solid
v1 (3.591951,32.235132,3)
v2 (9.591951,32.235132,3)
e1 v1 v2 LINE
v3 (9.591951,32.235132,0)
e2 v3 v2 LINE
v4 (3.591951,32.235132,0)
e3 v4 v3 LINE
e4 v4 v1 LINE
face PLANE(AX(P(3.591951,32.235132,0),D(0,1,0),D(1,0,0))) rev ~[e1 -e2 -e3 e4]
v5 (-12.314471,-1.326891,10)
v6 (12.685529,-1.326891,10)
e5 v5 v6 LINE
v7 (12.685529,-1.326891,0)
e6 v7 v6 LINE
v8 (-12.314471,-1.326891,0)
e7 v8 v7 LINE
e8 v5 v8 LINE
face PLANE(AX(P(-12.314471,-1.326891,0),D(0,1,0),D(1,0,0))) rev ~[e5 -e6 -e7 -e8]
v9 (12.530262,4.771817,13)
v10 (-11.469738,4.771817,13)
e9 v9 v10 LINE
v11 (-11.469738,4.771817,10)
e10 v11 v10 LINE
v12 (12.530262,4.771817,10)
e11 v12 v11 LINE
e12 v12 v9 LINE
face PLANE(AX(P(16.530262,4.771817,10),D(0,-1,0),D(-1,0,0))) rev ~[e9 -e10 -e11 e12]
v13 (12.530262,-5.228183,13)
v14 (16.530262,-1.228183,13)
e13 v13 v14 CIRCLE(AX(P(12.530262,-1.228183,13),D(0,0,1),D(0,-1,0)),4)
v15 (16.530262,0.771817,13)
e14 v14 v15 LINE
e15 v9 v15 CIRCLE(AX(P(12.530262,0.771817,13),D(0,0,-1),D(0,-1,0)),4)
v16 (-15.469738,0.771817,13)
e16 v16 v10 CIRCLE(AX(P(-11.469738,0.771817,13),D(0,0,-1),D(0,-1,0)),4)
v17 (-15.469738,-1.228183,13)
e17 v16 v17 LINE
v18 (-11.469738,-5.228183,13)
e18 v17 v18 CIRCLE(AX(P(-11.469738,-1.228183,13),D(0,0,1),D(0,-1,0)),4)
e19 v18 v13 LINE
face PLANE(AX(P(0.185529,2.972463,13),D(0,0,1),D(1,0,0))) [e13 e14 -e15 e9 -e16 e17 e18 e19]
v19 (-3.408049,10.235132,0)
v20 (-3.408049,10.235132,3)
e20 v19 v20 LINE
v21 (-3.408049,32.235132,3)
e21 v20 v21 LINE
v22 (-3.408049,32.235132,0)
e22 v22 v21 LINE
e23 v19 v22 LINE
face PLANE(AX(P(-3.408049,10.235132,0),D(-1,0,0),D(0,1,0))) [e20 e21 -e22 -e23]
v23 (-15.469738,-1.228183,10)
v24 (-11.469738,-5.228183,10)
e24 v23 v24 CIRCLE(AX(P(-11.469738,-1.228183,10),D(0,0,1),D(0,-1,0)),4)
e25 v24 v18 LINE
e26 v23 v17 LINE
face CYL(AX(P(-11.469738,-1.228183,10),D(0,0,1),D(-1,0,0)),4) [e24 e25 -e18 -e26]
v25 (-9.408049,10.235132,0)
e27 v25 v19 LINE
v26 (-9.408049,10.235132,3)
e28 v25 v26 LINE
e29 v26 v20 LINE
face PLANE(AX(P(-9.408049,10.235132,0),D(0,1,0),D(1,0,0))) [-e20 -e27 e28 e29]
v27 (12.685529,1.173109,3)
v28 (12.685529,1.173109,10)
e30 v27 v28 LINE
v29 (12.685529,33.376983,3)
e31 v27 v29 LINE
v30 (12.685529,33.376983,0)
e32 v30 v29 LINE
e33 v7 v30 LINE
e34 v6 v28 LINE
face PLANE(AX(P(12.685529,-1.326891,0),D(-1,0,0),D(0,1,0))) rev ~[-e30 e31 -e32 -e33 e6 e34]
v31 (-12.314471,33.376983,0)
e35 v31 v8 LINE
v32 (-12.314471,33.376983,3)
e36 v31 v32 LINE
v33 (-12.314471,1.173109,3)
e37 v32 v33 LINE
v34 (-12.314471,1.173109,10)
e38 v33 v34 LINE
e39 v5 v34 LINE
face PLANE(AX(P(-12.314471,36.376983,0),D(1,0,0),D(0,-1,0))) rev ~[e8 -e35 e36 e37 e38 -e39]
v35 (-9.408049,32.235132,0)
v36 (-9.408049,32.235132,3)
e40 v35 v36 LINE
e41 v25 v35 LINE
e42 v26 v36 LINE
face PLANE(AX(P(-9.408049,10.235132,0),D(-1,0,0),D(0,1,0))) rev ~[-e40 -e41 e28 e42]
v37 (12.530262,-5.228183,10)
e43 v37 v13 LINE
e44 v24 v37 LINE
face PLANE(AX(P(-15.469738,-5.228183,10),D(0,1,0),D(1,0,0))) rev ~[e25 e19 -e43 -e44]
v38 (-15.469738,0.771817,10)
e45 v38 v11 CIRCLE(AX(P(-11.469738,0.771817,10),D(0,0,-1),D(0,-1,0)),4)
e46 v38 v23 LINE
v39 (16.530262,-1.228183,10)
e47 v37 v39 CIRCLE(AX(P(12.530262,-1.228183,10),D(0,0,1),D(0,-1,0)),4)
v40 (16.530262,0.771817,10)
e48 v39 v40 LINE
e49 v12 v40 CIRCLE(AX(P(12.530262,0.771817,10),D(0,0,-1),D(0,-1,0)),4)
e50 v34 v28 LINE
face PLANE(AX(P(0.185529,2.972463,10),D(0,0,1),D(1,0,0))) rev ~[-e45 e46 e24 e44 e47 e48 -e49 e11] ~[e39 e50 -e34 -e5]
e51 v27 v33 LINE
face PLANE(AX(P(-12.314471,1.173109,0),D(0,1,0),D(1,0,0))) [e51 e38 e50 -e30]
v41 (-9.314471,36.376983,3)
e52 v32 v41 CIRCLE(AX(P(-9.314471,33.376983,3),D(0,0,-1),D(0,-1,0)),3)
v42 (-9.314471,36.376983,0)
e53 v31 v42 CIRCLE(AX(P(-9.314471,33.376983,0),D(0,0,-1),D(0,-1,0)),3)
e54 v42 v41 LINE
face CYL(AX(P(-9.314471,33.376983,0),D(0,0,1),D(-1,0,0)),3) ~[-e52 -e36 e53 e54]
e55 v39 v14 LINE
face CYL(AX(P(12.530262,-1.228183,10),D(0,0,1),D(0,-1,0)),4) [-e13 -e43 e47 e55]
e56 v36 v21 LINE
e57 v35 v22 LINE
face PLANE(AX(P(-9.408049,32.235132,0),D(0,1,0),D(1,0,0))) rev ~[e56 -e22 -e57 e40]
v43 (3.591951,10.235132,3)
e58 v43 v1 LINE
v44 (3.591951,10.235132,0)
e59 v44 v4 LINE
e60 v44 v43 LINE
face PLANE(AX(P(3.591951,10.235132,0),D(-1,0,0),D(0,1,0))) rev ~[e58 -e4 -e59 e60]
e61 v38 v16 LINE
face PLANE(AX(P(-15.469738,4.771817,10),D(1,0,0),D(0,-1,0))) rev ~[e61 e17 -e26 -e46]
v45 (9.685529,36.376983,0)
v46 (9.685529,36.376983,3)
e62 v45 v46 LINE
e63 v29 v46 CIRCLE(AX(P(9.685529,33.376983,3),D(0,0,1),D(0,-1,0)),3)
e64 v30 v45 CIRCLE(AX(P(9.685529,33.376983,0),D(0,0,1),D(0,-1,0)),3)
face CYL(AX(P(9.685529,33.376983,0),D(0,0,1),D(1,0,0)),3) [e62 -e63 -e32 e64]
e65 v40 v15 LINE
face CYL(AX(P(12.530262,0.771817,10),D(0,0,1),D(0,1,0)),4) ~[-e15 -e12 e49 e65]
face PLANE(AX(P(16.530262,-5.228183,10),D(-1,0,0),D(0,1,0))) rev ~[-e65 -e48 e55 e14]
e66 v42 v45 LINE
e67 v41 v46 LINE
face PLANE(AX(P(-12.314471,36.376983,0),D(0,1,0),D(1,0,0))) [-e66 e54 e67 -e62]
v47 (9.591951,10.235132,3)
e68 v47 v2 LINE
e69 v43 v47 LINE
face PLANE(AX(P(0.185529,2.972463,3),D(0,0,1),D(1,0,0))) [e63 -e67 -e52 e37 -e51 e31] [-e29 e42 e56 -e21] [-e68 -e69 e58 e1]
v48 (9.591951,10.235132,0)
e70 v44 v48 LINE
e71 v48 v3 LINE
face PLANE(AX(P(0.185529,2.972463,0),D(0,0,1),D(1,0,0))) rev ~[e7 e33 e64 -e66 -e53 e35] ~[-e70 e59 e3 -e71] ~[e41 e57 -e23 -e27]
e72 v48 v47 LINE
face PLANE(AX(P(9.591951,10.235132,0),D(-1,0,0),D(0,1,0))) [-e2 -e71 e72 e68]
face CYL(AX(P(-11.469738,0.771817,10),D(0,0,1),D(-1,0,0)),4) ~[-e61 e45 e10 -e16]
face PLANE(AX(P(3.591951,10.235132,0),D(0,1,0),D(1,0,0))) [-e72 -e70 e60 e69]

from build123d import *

# Parameters (mm, degrees)
F0_W     = 25
F0_H     = 3.598708484
F0_H_2   = 2.5
F0_H_3   = 31.6051654611
F0_W_2   = 6
F0_H_4   = 22
F1_DEPTH = 3
F2_DEPTH = 10
F3_START = 10
F3_DEPTH = 3
F4_R     = 4
F5_R     = 3


# Not quite as in the source:
# - a feature names something its author has since deleted; it is built from what else it names


with BuildPart() as f1:
    # F0 (on Top) → F1 (new body)
    with BuildSketch(Plane.XY):
        with Locations((0.1855289564, 2.9724632242)):
            Rectangle(F0_W, F0_H)
        with Locations((0.1855289564, -0.0768910178)):
            Rectangle(F0_W, F0_H_2)
        with Locations((0.1855289564, 20.5744001968)):
            Rectangle(F0_W, F0_H_3)
        with Locations((-6.4080492333, 21.2351317182)):
            Rectangle(F0_W_2, F0_H_4, mode=Mode.SUBTRACT)
        with Locations((6.5919507667, 21.2351317182)):
            Rectangle(F0_W_2, F0_H_4, mode=Mode.SUBTRACT)
    extrude(amount=F1_DEPTH)

    # F0 (on Top) → F2 (join)
    with BuildSketch(Plane.XY):
        with Locations((0.1855289564, -0.0768910178)):
            Rectangle(F0_W, F0_H_2)
    extrude(amount=F2_DEPTH)

    # F0 (on Top) → F3 (join)
    with BuildSketch(Plane.XY.offset(F3_START)):
        with Locations((0.1855289564, 2.9724632242)):
            Rectangle(F0_W, F0_H)
        Polygon((-12.3144710436, -1.3268910178), (-12.3144710436, 1.1731089822), (-12.3144710436, 4.7718174662), (-15.4697376937, 4.7718174662), (-15.4697376937, -5.2281825338), (16.5302623063, -5.2281825338), (16.5302623063, 4.7718174662), (12.6855289564, 4.7718174662), (12.6855289564, 1.1731089822), (12.6855289564, -1.3268910178), align=None)
        with Locations((0.1855289564, -0.0768910178)):
            Rectangle(F0_W, F0_H_2)
    extrude(amount=F3_DEPTH)

    # F4
    f4_edges = [f1.edges().sort_by_distance(p)[0] for p in [
        (16.530262, -5.228183, 11.5),
        (16.530262, 4.771817, 11.5),
        (-15.469738, -5.228183, 11.5),
        (-15.469738, 4.771817, 11.5),
    ]]
    fillet(f4_edges, radius=F4_R)

    # F5
    f5_edges = [f1.edges().sort_by_distance(p)[0] for p in [
        (-12.314471, 36.376983, 1.5),
        (12.685529, 36.376983, 1.5),
    ]]
    fillet(f5_edges, radius=F5_R)


solid = f1.part
